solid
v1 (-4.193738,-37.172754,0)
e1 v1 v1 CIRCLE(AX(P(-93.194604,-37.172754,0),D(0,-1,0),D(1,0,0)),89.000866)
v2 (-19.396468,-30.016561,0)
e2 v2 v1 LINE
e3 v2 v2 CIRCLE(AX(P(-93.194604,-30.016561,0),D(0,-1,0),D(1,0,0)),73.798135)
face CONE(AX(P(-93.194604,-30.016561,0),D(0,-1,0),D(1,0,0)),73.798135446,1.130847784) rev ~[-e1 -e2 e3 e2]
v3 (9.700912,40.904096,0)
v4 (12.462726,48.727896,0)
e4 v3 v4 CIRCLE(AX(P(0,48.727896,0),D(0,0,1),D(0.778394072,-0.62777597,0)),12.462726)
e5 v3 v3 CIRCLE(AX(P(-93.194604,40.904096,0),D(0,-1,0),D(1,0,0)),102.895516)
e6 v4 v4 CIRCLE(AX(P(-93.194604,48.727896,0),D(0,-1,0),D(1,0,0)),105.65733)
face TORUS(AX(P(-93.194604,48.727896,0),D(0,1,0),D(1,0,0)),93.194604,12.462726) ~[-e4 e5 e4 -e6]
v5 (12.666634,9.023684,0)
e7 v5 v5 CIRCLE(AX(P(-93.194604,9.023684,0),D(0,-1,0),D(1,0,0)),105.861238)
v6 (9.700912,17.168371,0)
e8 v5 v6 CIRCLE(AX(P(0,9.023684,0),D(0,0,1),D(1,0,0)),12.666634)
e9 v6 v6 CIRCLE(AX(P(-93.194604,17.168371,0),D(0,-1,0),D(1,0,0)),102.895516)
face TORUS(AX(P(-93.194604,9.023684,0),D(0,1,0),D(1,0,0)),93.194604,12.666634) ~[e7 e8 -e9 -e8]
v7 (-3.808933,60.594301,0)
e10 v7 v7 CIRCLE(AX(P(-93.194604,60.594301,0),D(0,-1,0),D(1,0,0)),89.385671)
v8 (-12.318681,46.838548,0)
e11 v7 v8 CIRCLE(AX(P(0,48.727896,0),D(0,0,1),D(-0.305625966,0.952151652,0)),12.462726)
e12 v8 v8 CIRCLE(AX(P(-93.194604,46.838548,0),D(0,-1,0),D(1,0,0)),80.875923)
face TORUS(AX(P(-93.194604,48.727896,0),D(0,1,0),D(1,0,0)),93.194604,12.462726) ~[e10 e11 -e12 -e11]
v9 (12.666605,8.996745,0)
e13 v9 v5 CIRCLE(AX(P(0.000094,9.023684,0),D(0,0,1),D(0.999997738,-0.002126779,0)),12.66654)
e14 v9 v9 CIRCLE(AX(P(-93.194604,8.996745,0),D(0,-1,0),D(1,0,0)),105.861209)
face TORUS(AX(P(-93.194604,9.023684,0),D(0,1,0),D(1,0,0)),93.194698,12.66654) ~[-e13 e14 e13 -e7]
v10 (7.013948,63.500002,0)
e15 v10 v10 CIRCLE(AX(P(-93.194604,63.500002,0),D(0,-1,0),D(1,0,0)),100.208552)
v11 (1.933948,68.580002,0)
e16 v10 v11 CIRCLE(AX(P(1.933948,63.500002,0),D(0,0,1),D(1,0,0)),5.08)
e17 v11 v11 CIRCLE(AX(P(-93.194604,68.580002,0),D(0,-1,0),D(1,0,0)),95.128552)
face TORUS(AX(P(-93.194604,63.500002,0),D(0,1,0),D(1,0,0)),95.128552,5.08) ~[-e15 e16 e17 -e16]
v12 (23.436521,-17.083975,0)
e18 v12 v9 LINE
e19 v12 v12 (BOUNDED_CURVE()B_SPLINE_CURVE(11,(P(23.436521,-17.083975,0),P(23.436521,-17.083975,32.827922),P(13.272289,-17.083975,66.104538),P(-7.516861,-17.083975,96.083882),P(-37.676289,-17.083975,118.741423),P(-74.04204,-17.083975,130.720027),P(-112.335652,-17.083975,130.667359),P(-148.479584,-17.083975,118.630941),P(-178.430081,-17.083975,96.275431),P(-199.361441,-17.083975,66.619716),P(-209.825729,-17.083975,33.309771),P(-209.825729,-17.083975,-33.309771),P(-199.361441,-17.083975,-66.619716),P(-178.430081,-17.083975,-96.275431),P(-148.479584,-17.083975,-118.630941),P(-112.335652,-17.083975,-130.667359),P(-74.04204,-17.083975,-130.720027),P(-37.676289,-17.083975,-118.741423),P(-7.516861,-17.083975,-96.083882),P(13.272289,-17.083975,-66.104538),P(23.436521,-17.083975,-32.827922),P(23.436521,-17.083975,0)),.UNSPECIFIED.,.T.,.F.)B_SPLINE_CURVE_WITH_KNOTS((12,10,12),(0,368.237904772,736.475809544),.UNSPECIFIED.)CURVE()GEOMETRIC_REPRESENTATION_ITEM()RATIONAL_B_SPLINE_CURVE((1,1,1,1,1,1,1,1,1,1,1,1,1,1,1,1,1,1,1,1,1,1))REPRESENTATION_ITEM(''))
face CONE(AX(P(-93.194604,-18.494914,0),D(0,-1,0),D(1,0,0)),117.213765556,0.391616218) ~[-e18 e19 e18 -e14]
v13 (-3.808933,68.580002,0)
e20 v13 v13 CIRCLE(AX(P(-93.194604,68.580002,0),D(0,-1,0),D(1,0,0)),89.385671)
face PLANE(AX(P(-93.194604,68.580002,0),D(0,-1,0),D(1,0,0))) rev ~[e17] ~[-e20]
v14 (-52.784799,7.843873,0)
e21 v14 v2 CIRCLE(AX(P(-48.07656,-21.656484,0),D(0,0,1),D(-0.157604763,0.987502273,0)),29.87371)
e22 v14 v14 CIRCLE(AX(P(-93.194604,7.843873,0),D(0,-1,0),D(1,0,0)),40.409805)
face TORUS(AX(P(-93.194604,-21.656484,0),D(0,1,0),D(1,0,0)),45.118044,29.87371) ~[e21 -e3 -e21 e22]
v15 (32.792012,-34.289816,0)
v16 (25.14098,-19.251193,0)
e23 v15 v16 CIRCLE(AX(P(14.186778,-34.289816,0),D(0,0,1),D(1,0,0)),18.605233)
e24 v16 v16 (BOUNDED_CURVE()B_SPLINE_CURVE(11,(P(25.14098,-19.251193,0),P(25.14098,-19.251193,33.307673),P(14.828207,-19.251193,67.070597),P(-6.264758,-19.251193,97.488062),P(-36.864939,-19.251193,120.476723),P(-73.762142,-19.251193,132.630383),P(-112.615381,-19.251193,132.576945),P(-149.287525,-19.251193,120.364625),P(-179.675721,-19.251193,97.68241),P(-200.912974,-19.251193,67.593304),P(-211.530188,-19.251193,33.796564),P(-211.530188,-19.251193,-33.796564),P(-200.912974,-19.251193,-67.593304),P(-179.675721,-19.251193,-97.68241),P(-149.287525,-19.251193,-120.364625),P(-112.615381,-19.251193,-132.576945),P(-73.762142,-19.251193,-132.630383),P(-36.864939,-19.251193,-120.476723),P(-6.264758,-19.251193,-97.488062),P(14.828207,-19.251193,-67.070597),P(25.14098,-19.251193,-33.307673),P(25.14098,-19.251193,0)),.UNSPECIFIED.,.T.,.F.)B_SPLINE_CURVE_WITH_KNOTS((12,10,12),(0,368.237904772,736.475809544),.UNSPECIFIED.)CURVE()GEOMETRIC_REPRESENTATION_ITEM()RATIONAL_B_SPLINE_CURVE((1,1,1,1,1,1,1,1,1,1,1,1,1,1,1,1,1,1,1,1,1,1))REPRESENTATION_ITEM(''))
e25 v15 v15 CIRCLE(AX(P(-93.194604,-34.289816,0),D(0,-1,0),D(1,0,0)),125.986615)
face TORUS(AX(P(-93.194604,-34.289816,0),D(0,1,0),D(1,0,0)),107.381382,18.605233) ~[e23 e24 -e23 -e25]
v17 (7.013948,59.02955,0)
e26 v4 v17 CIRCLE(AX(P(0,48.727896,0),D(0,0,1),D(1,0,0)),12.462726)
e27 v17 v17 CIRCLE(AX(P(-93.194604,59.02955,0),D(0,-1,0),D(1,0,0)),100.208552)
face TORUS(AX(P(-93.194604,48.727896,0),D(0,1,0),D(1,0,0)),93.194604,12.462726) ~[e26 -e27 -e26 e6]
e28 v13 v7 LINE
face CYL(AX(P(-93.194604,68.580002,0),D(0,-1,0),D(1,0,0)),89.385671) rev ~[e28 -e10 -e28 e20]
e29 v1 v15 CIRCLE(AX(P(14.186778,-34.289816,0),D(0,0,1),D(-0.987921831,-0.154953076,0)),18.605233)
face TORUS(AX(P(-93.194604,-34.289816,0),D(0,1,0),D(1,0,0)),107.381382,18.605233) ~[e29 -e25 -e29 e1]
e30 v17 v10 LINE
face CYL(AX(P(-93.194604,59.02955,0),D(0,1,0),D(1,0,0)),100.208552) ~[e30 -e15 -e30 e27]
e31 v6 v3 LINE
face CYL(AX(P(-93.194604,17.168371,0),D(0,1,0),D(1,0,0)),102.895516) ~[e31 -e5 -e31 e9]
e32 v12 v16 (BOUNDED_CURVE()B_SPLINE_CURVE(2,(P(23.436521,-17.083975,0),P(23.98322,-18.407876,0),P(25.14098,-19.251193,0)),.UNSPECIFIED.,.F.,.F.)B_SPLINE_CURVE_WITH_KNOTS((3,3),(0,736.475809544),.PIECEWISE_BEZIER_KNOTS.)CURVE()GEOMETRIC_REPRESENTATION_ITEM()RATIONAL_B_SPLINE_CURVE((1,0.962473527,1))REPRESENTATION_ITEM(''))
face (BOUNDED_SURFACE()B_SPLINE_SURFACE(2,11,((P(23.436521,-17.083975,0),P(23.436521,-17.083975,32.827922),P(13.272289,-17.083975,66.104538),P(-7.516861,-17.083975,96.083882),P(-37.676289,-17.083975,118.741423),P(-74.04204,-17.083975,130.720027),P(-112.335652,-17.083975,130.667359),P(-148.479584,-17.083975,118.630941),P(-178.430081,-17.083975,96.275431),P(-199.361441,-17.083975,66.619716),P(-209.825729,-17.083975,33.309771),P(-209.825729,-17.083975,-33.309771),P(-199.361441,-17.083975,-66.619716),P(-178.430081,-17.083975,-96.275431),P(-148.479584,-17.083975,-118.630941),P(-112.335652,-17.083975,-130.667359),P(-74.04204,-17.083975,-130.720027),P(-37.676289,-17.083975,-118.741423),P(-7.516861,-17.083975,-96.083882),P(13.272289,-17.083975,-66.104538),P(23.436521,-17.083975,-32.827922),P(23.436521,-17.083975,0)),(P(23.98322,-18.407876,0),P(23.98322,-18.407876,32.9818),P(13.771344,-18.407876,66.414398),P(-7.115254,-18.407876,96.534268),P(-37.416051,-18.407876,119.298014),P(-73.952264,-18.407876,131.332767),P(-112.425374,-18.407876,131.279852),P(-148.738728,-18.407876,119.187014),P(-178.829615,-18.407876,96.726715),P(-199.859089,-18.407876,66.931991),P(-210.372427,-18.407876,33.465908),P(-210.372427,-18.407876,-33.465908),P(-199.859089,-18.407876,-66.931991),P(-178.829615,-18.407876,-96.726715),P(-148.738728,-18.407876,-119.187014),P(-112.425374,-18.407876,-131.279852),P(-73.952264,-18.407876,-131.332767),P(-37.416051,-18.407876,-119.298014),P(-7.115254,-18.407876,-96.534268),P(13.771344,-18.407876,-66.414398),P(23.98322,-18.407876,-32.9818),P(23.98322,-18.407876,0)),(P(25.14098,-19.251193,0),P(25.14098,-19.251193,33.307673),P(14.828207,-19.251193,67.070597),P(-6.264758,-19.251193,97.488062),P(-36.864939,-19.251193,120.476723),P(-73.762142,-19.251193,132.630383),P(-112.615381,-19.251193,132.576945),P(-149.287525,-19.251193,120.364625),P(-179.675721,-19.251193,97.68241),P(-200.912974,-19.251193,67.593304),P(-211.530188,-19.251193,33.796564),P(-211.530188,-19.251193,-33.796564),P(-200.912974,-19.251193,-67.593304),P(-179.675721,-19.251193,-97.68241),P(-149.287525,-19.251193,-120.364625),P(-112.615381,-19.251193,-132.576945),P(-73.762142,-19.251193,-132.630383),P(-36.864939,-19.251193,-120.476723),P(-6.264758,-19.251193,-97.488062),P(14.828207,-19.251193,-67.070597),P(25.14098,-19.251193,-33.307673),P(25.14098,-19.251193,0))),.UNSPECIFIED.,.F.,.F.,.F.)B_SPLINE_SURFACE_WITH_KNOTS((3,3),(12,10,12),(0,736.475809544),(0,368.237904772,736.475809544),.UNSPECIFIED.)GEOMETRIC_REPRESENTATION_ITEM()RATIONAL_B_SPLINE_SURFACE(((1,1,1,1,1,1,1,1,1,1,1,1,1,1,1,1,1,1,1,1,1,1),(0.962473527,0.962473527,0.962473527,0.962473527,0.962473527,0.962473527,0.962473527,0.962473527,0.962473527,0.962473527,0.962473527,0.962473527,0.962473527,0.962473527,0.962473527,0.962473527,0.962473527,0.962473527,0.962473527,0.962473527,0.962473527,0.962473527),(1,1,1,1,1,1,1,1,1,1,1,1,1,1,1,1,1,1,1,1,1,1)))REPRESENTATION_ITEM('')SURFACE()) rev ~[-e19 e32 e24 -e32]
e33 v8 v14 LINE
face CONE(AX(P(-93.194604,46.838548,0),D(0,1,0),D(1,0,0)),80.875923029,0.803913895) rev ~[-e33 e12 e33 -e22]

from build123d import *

# Parameters (mm, degrees)
F2_R = 5.08
F3_R = 5.08


with BuildPart() as f1:
    # F0 (on Top) → F1 (revolve)
    with BuildSketch(Plane.XY):
        with BuildLine():
            ThreePointArc((9.7009118807, 40.9040962808), (11.7520070447, 44.5794186576), (12.4627258003, 48.7278960645))
            ThreePointArc((12.4627258003, 48.7278960645), (11.0166338716, 54.5548431652), (7.0139478912, 59.0295497839))
            ThreePointArc((7.0139478912, 59.0295497839), (1.7832953622, 61.0623758681), (-3.8089326117, 60.594301027))
            ThreePointArc((-3.8089326117, 60.594301027), (-10.5985925253, 55.2845240741), (-12.3186808909, 46.8385481656))
            ThreePointArc((-12.3186808909, 46.8385481656), (-11.2979086397, 43.4670221122), (-9.3744965448, 40.5158105252))
            ThreePointArc((-9.3744965448, 40.5158105252), (-1.9976894845, 36.4263201046), (6.2941219653, 37.971336993))
            ThreePointArc((6.2941219653, 37.971336993), (8.130839206, 39.2828450758), (9.7009118807, 40.9040962808))
        make_face()
        with BuildLine():
            ThreePointArc((-3.8089326117, 60.594301027), (1.7832953622, 61.0623758681), (7.0139478912, 59.0295497839))
            Line((7.0139478912, 59.0295497839), (7.0139478912, 68.5800015926))
            Line((7.0139478912, 68.5800015926), (-3.8089326117, 68.5800015926))
            Line((-3.8089326117, 68.5800015926), (-3.8089326117, 60.594301027))
        make_face()
        with BuildLine():
            Line((9.7009118807, 17.1683712151), (9.7009118807, 40.9040962808))
            ThreePointArc((9.7009118807, 40.9040962808), (8.130839206, 39.2828450758), (6.2941219653, 37.971336993))
            Line((6.2941219653, 37.971336993), (6.2941219653, 20.0158471298))
            ThreePointArc((6.2941219653, 20.0158471298), (8.1232571488, 18.7425478578), (9.7009118807, 17.1683712151))
        make_face()
        with BuildLine():
            Line((6.2941219653, 20.0158471298), (6.2941219653, 37.971336993))
            ThreePointArc((6.2941219653, 37.971336993), (-1.9976894845, 36.4263201046), (-9.3744965448, 40.5158105252))
            Line((-9.3744965448, 40.5158105252), (-42.5554838048, 7.7026077091))
            ThreePointArc((-42.5554838048, 7.7026077091), (-34.4707888035, 4.93903315), (-27.4990179272, 0))
            Line((-27.4990179272, 0), (-12.0346660983, 5.0726801795))
            ThreePointArc((-12.0346660983, 5.0726801795), (-8.003937866, 18.8410461734), (6.2941219653, 20.0158471298))
        make_face()
        with BuildLine():
            ThreePointArc((12.6666341186, 9.023684077), (11.9021326094, 13.3576036935), (9.7009118807, 17.1683712151))
            ThreePointArc((9.7009118807, 17.1683712151), (8.1232571488, 18.7425478578), (6.2941219653, 20.0158471298))
            ThreePointArc((6.2941219653, 20.0158471298), (-8.003937866, 18.8410461734), (-12.0346660983, 5.0726801795))
            ThreePointArc((-12.0346660983, 5.0726801795), (-10.7649616155, 2.3484146958), (-8.8891363795, 0))
            ThreePointArc((-8.8891363795, 0), (4.8787983734, -2.6656677582), (12.666605472, 8.996745052))
            ThreePointArc((12.666605472, 8.996745052), (12.666626957, 9.0102145568), (12.6666341186, 9.023684077))
        make_face()
        with BuildLine():
            ThreePointArc((-9.3744965448, 40.5158105252), (-11.2979086397, 43.4670221122), (-12.3186808909, 46.8385481656))
            Line((-12.3186808909, 46.8385481656), (-52.7847993644, 7.8438725712))
            ThreePointArc((-52.7847993644, 7.8438725712), (-47.6640495586, 8.2143778422), (-42.5554838048, 7.7026077091))
            Line((-42.5554838048, 7.7026077091), (-9.3744965448, 40.5158105252))
        make_face()
        with BuildLine():
            ThreePointArc((-42.5554838048, 7.7026077091), (-47.6640495586, 8.2143778422), (-52.7847993644, 7.8438725712))
            ThreePointArc((-52.7847993644, 7.8438725712), (-70.4822634568, -41.4156089372), (-19.396468474, -30.0165605224))
            ThreePointArc((-19.396468474, -30.0165605224), (-18.5027603086, -25.8789123067), (-18.2028503372, -21.656483971))
            ThreePointArc((-18.2028503372, -21.656483971), (-18.3038042539, -19.2026004419), (-18.6059836854, -16.7653020075))
            ThreePointArc((-18.6059836854, -16.7653020075), (-20.3241438407, -10.6001768173), (-23.3160750285, -4.9425102755))
            ThreePointArc((-23.3160750285, -4.9425102755), (-25.2732427868, -2.3575913031), (-27.4990179272, 0))
            ThreePointArc((-27.4990179272, 0), (-34.4707888035, 4.93903315), (-42.5554838048, 7.7026077091))
        make_face()
        with BuildLine():
            ThreePointArc((-8.8891363795, 0), (-10.7649616155, 2.3484146958), (-12.0346660983, 5.0726801795))
            Line((-12.0346660983, 5.0726801795), (-27.4990179272, 0))
            ThreePointArc((-27.4990179272, 0), (-25.2732427868, -2.3575913031), (-23.3160750285, -4.9425102755))
            Line((-23.3160750285, -4.9425102755), (-8.8891363795, 0))
        make_face()
        with BuildLine():
            Line((24.0191616365, -18.4949137387), (12.666605472, 8.996745052))
            ThreePointArc((12.666605472, 8.996745052), (4.8787983734, -2.6656677582), (-8.8891363795, 0))
            Line((-8.8891363795, 0), (-23.3160750285, -4.9425102755))
            ThreePointArc((-23.3160750285, -4.9425102755), (-20.3241438407, -10.6001768173), (-18.6059836854, -16.7653020075))
            Line((-18.6059836854, -16.7653020075), (-2.9157078566, -26.9645396174))
            ThreePointArc((-2.9157078566, -26.9645396174), (5.888669157, -17.6376063496), (18.6366916792, -16.224573954))
            ThreePointArc((18.6366916792, -16.224573954), (21.4175881123, -17.1471765082), (24.0191616365, -18.4949137387))
        make_face()
        with BuildLine():
            ThreePointArc((-18.2028503372, -21.656483971), (-18.5027603086, -25.8789123067), (-19.396468474, -30.0165605224))
            Line((-19.396468474, -30.0165605224), (-4.1937379558, -37.1727543587))
            ThreePointArc((-4.1937379558, -37.1727543587), (-4.274336975, -31.9785540126), (-2.9157078566, -26.9645396174))
            Line((-2.9157078566, -26.9645396174), (-18.6059836854, -16.7653020075))
            ThreePointArc((-18.6059836854, -16.7653020075), (-18.3038042539, -19.2026004419), (-18.2028503372, -21.656483971))
        make_face()
        with BuildLine():
            ThreePointArc((32.792011574, -34.2898162166), (30.4515944815, -25.2559654275), (24.0191616365, -18.4949137387))
            ThreePointArc((24.0191616365, -18.4949137387), (21.4175881123, -17.1471765082), (18.6366916792, -16.224573954))
            ThreePointArc((18.6366916792, -16.224573954), (5.888669157, -17.6376063496), (-2.9157078566, -26.9645396174))
            ThreePointArc((-2.9157078566, -26.9645396174), (-4.274336975, -31.9785540126), (-4.1937379558, -37.1727543587))
            ThreePointArc((-4.1937379558, -37.1727543587), (15.6326196944, -52.8387851947), (32.792011574, -34.2898162166))
        make_face()
    revolve(axis=Axis((-93.19460392, 9.023681283, 0), (0, -1, 0)))

    # F2
    f2_edges = [f1.edges().sort_by_distance(p)[0] for p in [
        (-193.403156, 68.580002, 0),
    ]]
    fillet(f2_edges, radius=F2_R)

    # F3
    f3_edges = [f1.edges().sort_by_distance(p)[0] for p in [
        (-210.408369, -18.494914, 0),
    ]]
    fillet(f3_edges, radius=F3_R)


solid = f1.part
